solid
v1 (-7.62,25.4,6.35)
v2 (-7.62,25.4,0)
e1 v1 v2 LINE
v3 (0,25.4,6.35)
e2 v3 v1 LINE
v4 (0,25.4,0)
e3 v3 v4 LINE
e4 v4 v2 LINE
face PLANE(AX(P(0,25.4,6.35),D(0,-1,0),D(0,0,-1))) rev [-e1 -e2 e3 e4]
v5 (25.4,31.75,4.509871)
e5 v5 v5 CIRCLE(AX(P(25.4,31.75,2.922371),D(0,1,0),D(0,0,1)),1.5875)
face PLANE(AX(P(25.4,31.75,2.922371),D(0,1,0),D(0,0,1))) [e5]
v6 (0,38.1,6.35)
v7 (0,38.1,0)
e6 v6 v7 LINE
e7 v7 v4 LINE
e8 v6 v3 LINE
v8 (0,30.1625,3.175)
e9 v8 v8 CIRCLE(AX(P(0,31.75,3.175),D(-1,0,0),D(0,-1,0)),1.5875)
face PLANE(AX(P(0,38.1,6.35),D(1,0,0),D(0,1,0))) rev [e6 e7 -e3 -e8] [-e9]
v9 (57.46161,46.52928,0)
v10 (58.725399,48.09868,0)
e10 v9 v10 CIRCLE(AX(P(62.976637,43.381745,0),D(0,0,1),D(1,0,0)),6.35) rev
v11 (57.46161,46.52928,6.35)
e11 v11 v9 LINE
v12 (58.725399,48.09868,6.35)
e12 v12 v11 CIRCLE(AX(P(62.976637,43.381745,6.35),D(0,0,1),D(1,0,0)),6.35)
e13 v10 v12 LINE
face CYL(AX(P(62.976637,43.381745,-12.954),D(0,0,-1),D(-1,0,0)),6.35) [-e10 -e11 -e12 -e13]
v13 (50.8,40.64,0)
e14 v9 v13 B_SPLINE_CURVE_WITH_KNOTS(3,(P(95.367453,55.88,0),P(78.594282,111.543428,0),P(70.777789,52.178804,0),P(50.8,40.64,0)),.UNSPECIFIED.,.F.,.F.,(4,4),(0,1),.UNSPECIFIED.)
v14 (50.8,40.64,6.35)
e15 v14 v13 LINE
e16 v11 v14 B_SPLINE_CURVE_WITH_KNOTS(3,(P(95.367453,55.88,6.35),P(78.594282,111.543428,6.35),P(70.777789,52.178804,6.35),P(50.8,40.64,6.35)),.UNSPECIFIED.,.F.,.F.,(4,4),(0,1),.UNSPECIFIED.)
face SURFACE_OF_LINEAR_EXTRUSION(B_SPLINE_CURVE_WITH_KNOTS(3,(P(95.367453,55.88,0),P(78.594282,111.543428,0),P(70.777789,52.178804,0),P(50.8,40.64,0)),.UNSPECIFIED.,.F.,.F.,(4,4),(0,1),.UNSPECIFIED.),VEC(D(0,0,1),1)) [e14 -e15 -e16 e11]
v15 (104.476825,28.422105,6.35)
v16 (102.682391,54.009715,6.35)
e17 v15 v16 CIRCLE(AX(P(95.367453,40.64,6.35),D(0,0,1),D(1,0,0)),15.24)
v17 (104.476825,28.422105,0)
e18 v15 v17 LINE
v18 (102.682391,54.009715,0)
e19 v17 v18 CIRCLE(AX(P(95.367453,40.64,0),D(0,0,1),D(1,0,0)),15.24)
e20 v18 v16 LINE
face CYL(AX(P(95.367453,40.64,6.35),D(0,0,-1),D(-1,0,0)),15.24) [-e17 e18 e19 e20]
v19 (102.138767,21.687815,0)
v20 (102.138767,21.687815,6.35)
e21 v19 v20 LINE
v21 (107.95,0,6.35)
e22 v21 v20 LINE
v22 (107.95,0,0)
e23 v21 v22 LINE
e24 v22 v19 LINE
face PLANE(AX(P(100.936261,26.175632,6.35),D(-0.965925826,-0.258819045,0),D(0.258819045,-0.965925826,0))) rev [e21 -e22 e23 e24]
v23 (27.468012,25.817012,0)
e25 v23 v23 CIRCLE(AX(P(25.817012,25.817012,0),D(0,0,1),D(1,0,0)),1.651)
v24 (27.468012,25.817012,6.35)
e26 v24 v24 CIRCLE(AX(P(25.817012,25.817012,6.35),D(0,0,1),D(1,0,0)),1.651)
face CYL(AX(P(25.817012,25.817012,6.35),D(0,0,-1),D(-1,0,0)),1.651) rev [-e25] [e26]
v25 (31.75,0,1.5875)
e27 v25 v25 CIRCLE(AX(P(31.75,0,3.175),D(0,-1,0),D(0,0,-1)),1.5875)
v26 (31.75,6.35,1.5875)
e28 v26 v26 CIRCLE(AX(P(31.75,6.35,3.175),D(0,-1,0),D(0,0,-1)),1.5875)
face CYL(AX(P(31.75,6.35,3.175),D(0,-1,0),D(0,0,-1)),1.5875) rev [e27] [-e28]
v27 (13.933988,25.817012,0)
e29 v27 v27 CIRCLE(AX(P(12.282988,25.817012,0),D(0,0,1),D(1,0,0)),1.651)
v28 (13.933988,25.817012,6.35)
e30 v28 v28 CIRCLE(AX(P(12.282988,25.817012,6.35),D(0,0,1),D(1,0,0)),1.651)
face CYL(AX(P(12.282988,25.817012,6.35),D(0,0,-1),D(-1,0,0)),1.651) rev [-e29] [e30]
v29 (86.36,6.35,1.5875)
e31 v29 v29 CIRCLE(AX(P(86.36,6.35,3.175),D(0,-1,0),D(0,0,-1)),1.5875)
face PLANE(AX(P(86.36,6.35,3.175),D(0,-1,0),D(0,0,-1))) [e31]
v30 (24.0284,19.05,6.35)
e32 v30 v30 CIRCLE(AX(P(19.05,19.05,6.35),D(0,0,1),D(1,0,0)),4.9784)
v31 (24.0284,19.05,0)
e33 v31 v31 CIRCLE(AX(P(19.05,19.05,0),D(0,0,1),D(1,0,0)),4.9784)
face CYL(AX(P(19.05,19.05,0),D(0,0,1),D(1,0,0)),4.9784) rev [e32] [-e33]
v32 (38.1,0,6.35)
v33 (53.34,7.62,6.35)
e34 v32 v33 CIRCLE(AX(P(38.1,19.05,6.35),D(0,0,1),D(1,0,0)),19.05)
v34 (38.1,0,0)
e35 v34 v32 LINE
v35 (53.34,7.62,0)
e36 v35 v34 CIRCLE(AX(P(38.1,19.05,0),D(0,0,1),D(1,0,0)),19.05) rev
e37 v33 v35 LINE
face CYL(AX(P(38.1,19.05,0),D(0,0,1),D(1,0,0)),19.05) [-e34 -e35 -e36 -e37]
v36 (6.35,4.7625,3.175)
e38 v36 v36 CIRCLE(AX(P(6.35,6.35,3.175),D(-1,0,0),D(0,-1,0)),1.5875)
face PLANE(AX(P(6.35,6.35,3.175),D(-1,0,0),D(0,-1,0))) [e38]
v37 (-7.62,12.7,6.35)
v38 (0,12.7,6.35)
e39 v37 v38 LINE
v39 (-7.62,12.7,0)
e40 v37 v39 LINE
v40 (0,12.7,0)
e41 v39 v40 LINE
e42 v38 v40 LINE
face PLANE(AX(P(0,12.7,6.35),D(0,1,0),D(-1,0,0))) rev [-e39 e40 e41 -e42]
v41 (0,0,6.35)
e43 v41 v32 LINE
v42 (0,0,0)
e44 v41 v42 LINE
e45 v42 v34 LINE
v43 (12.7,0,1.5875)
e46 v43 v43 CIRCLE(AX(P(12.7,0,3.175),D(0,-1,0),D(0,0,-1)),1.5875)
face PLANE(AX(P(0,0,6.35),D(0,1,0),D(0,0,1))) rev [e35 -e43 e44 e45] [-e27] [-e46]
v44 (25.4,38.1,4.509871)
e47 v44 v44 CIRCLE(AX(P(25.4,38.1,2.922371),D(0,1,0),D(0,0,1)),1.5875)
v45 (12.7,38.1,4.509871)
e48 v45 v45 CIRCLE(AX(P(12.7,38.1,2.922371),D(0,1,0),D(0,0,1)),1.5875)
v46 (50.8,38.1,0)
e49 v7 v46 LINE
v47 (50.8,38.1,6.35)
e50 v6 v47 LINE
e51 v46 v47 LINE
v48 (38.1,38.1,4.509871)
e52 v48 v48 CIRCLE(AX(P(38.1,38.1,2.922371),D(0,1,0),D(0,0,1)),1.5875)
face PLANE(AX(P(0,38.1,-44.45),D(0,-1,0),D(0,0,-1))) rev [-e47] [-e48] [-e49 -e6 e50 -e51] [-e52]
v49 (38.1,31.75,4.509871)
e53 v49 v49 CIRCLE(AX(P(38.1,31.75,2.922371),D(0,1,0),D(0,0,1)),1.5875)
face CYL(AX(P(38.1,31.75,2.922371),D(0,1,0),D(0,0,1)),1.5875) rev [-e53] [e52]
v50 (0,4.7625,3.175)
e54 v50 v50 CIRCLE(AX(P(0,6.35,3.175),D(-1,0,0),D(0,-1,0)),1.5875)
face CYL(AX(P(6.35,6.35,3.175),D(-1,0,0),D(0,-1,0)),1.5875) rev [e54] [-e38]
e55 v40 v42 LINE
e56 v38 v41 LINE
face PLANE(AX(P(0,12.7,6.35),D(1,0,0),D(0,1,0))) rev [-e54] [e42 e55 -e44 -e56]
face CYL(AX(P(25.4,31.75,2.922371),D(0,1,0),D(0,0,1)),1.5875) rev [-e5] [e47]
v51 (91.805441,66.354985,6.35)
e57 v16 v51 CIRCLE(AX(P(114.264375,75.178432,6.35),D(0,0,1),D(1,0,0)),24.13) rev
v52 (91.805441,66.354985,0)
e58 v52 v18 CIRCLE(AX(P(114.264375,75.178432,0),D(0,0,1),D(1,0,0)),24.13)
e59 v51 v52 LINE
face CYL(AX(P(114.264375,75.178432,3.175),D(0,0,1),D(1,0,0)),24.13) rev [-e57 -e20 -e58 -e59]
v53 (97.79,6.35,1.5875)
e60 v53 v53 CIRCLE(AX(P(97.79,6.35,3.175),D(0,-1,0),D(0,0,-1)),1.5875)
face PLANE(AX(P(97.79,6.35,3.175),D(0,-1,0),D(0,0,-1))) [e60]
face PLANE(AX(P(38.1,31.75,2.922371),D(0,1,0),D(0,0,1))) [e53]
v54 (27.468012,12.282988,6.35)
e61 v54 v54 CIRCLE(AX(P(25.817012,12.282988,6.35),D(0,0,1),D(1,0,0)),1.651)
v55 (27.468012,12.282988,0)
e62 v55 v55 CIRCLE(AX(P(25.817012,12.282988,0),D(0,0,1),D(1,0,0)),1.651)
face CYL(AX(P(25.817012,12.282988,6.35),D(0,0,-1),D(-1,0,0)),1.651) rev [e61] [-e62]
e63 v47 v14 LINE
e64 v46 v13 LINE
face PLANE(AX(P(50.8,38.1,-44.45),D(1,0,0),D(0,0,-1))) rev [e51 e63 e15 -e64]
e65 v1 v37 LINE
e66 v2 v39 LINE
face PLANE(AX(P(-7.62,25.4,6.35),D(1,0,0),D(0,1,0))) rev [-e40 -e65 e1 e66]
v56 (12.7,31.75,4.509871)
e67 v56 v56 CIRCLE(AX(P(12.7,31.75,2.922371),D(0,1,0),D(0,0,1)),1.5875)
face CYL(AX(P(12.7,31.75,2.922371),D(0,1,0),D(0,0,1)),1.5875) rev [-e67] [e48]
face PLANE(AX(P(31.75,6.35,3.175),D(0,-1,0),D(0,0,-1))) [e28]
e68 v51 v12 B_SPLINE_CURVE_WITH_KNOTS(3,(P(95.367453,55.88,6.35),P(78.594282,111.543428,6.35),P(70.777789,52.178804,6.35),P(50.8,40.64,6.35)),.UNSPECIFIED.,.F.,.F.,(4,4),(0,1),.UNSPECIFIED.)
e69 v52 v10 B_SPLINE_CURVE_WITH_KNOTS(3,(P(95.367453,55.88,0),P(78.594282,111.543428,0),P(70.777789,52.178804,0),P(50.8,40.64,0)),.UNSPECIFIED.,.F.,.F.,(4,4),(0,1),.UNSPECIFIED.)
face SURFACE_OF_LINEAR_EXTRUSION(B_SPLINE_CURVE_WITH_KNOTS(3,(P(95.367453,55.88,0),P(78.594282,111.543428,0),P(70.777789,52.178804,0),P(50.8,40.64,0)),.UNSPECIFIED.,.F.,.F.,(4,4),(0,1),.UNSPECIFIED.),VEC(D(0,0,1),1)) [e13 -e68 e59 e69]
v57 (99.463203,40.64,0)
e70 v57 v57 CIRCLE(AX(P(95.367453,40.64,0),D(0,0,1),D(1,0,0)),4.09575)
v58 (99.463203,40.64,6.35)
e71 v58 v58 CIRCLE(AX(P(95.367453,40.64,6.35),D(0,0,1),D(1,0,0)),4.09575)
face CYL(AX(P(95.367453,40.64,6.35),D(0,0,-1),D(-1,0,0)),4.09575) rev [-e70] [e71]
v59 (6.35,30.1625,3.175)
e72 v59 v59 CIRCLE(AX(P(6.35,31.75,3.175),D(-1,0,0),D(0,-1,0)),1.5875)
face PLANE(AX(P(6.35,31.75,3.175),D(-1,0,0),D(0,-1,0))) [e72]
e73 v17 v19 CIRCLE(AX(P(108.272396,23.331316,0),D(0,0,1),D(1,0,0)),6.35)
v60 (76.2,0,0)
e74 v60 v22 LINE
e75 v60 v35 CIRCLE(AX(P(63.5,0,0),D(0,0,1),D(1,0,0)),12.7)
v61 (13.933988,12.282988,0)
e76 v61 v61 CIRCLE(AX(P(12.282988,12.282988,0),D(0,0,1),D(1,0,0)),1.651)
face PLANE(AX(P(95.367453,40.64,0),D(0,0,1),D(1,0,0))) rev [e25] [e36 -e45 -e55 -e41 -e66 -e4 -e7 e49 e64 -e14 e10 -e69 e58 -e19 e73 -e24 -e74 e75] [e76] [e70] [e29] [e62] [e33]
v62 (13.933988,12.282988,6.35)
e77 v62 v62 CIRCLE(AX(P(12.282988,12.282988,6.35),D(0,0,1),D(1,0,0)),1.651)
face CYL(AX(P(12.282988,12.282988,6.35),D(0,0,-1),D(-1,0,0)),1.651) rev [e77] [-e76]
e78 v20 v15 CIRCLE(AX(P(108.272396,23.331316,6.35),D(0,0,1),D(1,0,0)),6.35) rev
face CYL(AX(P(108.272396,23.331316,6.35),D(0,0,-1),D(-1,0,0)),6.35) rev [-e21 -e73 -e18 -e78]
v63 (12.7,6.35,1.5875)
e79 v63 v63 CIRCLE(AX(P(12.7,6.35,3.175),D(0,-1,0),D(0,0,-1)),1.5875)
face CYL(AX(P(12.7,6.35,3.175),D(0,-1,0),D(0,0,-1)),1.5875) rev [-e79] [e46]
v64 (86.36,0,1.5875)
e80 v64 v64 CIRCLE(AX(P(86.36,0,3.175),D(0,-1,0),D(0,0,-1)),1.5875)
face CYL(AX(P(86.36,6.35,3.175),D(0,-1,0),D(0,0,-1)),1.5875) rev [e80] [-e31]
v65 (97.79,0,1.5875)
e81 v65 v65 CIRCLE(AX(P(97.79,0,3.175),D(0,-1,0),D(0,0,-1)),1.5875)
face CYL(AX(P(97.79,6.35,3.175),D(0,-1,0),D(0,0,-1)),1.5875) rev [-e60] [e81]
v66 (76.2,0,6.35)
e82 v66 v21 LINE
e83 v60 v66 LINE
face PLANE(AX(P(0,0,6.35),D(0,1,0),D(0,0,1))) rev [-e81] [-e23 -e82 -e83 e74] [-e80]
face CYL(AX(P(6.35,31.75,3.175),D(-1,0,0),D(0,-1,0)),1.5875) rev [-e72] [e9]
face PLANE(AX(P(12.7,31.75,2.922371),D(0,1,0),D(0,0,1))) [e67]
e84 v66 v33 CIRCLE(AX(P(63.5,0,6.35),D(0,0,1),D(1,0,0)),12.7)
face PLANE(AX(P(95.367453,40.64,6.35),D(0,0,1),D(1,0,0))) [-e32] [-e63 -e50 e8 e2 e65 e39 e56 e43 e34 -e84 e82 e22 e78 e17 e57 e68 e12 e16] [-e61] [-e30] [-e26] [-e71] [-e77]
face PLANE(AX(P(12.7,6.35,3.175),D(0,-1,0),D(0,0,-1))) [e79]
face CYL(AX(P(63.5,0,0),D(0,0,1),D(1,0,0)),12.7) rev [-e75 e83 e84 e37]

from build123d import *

# Parameters (mm, degrees)
SKETCH1_R           = 4.09575
SKETCH1_R_2         = 1.651
BOSS_EXTRUDE1_DEPTH = 6.35
SKETCH3_R           = 1.5875
CUT_EXTRUDE1_DEPTH  = 6.35
CUT_EXTRUDE2_DEPTH  = 6.35
SKETCH7_R           = 4.9784
CUT_EXTRUDE3_DEPTH  = 125.084268237
FILLET1_R           = 6.35
SKETCH8_W           = 50.8
SKETCH8_H           = 12.7
CUT_EXTRUDE4_DEPTH  = 50.8
CUT_EXTRUDE5_DEPTH  = 19.304
FILLET6_R           = 6.35
FILLET7_R           = 6.35
FILLET8_R           = 19.05
SKETCH10_R          = 1.5875
CUT_EXTRUDE6_DEPTH  = 6.35
SKETCH11_R          = 1.5875
CUT_EXTRUDE7_DEPTH  = 6.35
BOSS_EXTRUDE2_DEPTH = 6.35
FILLET9_R           = 24.13


with BuildPart() as part:
    # Sketch1 → Boss-Extrude1 (new body)
    with BuildSketch(Plane.XY):
        with BuildLine():
            Line((0, 0), (107.95, 0))
            Line((107.95, 0), (100.9362606, 26.175631792))
            Line((100.9362606, 26.175631792), (100.868755024, 26.427566033))
            ThreePointArc((100.868755024, 26.427566033), (110.348359368, 43.438223217), (95.367453293, 55.88))
            Line((95.367453293, 55.88), (0, 38.1))
            Line((0, 38.1), (0, 25.4))
            Line((0, 25.4), (-7.62, 25.4))
            Line((-7.62, 25.4), (-7.62, 12.7))
            Line((-7.62, 12.7), (0, 12.7))
            Line((0, 12.7), (0, 0))
        make_face()
        with Locations((95.367453293, 40.64)):
            Circle(SKETCH1_R, mode=Mode.SUBTRACT)
        with Locations((25.817011896, 25.817011896)):
            Circle(SKETCH1_R_2, mode=Mode.SUBTRACT)
        with Locations((25.817011896, 12.282988104)):
            Circle(SKETCH1_R_2, mode=Mode.SUBTRACT)
        with Locations((12.282988104, 12.282988104)):
            Circle(SKETCH1_R_2, mode=Mode.SUBTRACT)
        with Locations((12.282988104, 25.817011896)):
            Circle(SKETCH1_R_2, mode=Mode.SUBTRACT)
    extrude(amount=BOSS_EXTRUDE1_DEPTH)

    # Sketch3 → Cut-Extrude1 (cut)
    with BuildSketch(Plane.ZY):
        with Locations(Location((3.175, 31.75, 0), (0, 0, 270))):
            Circle(SKETCH3_R)
        with Locations(Location((3.175, 6.35, 0), (0, 0, 270))):
            Circle(SKETCH3_R)
    extrude(amount=-CUT_EXTRUDE1_DEPTH, mode=Mode.SUBTRACT)

    # Sketch6 → Cut-Extrude2 (cut)
    with BuildSketch(Plane.XY.offset(6.35)):
        with BuildLine():
            Line((50.8, 0), (76.2, 0))
            ThreePointArc((76.2, 0), (63.5, 12.7), (50.8, 0))
        make_face()
    extrude(amount=-CUT_EXTRUDE2_DEPTH, mode=Mode.SUBTRACT)

    # Sketch7 → Cut-Extrude3 (cut, through all)
    with BuildSketch(Plane.XY.offset(6.35)):
        with Locations((19.05, 19.05)):
            Circle(SKETCH7_R)
    extrude(amount=-CUT_EXTRUDE3_DEPTH, mode=Mode.SUBTRACT)

    # Fillet1
    fillet1_edges = [part.edges().sort_by_distance(p)[0] for p in [
        (100.868755024, 26.427566033, 3.175),
    ]]
    fillet(fillet1_edges, radius=FILLET1_R)

    # Sketch8 → Cut-Extrude4 (cut)
    with BuildSketch(Plane.XY.offset(6.35)):
        with Locations((25.4, 44.45)):
            Rectangle(SKETCH8_W, SKETCH8_H)
    extrude(amount=-CUT_EXTRUDE4_DEPTH, mode=Mode.SUBTRACT)

    # Sketch9 → Cut-Extrude5 (cut)
    with BuildSketch(Plane.XY.offset(6.35)):
        Polygon((50.8, 47.57098794), (50.8, 40.64), (57.15, 40.64), (57.15, 48.754861432), align=None)
    extrude(amount=-CUT_EXTRUDE5_DEPTH, mode=Mode.SUBTRACT)

    # Fillet6
    fillet6_edges = [part.edges().sort_by_distance(p)[0] for p in [
        (57.15, 40.64, 3.175),
    ]]
    fillet(fillet6_edges, radius=FILLET6_R - 0.0001)  # a hair under: the kernel refuses the full size

    # Fillet7
    fillet7_edges = [part.edges().sort_by_distance(p)[0] for p in [
        (57.15, 48.754861432, 3.175),
    ]]
    fillet(fillet7_edges, radius=FILLET7_R)

    # Fillet8
    fillet8_edges = [part.edges().sort_by_distance(p)[0] for p in [
        (50.8, 0, 3.175),
    ]]
    fillet(fillet8_edges, radius=FILLET8_R)

    # Sketch10 → Cut-Extrude6 (cut)
    with BuildSketch(Plane.XZ):
        with Locations(Location((97.79, 3.175, 0), (0, 0, 270))):
            Circle(SKETCH10_R)
        with Locations(Location((86.36, 3.175, 0), (0, 0, 270))):
            Circle(SKETCH10_R)
        with Locations(Location((31.75, 3.175, 0), (0, 0, 270))):
            Circle(SKETCH10_R)
        with Locations(Location((12.7, 3.175, 0), (0, 0, 270))):
            Circle(SKETCH10_R)
    extrude(amount=-CUT_EXTRUDE6_DEPTH, mode=Mode.SUBTRACT)

    # Sketch11 → Cut-Extrude7 (cut)
    with BuildSketch(Plane(origin=(0, 38.1, 0), x_dir=(1, 0, 0), z_dir=(0, 1, 0))):
        with Locations(Location((12.7, -2.922371253, 0), (0, 0, 270))):
            Circle(SKETCH11_R)
        with Locations(Location((25.4, -2.922371253, 0), (0, 0, 270))):
            Circle(SKETCH11_R)
        with Locations(Location((38.1, -2.922371253, 0), (0, 0, 270))):
            Circle(SKETCH11_R)
    extrude(amount=-CUT_EXTRUDE7_DEPTH, mode=Mode.SUBTRACT)

    # Sketch12 → Boss-Extrude2 (add)
    with BuildSketch(Plane.XY.offset(6.35)):
        with BuildLine():
            Line((50.8, 40.64), (85.027112904, 40.64))
            Line((85.027112904, 40.64), (95.367453293, 55.88))
            add(Edge.make_bspline(
                [(50.8, 40.64), (70.777788932, 52.178803671), (78.594281742, 111.543427795), (95.367453293, 55.88)],
                knots=[0, 0, 0, 0, 1, 1, 1, 1], degree=3))
        make_face()
    extrude(amount=-BOSS_EXTRUDE2_DEPTH)

    # Fillet9
    fillet9_edges = [part.edges().sort_by_distance(p)[0] for p in [
        (95.367453293, 55.88, 3.175),
    ]]
    fillet(fillet9_edges, radius=FILLET9_R)


solid = part.part
